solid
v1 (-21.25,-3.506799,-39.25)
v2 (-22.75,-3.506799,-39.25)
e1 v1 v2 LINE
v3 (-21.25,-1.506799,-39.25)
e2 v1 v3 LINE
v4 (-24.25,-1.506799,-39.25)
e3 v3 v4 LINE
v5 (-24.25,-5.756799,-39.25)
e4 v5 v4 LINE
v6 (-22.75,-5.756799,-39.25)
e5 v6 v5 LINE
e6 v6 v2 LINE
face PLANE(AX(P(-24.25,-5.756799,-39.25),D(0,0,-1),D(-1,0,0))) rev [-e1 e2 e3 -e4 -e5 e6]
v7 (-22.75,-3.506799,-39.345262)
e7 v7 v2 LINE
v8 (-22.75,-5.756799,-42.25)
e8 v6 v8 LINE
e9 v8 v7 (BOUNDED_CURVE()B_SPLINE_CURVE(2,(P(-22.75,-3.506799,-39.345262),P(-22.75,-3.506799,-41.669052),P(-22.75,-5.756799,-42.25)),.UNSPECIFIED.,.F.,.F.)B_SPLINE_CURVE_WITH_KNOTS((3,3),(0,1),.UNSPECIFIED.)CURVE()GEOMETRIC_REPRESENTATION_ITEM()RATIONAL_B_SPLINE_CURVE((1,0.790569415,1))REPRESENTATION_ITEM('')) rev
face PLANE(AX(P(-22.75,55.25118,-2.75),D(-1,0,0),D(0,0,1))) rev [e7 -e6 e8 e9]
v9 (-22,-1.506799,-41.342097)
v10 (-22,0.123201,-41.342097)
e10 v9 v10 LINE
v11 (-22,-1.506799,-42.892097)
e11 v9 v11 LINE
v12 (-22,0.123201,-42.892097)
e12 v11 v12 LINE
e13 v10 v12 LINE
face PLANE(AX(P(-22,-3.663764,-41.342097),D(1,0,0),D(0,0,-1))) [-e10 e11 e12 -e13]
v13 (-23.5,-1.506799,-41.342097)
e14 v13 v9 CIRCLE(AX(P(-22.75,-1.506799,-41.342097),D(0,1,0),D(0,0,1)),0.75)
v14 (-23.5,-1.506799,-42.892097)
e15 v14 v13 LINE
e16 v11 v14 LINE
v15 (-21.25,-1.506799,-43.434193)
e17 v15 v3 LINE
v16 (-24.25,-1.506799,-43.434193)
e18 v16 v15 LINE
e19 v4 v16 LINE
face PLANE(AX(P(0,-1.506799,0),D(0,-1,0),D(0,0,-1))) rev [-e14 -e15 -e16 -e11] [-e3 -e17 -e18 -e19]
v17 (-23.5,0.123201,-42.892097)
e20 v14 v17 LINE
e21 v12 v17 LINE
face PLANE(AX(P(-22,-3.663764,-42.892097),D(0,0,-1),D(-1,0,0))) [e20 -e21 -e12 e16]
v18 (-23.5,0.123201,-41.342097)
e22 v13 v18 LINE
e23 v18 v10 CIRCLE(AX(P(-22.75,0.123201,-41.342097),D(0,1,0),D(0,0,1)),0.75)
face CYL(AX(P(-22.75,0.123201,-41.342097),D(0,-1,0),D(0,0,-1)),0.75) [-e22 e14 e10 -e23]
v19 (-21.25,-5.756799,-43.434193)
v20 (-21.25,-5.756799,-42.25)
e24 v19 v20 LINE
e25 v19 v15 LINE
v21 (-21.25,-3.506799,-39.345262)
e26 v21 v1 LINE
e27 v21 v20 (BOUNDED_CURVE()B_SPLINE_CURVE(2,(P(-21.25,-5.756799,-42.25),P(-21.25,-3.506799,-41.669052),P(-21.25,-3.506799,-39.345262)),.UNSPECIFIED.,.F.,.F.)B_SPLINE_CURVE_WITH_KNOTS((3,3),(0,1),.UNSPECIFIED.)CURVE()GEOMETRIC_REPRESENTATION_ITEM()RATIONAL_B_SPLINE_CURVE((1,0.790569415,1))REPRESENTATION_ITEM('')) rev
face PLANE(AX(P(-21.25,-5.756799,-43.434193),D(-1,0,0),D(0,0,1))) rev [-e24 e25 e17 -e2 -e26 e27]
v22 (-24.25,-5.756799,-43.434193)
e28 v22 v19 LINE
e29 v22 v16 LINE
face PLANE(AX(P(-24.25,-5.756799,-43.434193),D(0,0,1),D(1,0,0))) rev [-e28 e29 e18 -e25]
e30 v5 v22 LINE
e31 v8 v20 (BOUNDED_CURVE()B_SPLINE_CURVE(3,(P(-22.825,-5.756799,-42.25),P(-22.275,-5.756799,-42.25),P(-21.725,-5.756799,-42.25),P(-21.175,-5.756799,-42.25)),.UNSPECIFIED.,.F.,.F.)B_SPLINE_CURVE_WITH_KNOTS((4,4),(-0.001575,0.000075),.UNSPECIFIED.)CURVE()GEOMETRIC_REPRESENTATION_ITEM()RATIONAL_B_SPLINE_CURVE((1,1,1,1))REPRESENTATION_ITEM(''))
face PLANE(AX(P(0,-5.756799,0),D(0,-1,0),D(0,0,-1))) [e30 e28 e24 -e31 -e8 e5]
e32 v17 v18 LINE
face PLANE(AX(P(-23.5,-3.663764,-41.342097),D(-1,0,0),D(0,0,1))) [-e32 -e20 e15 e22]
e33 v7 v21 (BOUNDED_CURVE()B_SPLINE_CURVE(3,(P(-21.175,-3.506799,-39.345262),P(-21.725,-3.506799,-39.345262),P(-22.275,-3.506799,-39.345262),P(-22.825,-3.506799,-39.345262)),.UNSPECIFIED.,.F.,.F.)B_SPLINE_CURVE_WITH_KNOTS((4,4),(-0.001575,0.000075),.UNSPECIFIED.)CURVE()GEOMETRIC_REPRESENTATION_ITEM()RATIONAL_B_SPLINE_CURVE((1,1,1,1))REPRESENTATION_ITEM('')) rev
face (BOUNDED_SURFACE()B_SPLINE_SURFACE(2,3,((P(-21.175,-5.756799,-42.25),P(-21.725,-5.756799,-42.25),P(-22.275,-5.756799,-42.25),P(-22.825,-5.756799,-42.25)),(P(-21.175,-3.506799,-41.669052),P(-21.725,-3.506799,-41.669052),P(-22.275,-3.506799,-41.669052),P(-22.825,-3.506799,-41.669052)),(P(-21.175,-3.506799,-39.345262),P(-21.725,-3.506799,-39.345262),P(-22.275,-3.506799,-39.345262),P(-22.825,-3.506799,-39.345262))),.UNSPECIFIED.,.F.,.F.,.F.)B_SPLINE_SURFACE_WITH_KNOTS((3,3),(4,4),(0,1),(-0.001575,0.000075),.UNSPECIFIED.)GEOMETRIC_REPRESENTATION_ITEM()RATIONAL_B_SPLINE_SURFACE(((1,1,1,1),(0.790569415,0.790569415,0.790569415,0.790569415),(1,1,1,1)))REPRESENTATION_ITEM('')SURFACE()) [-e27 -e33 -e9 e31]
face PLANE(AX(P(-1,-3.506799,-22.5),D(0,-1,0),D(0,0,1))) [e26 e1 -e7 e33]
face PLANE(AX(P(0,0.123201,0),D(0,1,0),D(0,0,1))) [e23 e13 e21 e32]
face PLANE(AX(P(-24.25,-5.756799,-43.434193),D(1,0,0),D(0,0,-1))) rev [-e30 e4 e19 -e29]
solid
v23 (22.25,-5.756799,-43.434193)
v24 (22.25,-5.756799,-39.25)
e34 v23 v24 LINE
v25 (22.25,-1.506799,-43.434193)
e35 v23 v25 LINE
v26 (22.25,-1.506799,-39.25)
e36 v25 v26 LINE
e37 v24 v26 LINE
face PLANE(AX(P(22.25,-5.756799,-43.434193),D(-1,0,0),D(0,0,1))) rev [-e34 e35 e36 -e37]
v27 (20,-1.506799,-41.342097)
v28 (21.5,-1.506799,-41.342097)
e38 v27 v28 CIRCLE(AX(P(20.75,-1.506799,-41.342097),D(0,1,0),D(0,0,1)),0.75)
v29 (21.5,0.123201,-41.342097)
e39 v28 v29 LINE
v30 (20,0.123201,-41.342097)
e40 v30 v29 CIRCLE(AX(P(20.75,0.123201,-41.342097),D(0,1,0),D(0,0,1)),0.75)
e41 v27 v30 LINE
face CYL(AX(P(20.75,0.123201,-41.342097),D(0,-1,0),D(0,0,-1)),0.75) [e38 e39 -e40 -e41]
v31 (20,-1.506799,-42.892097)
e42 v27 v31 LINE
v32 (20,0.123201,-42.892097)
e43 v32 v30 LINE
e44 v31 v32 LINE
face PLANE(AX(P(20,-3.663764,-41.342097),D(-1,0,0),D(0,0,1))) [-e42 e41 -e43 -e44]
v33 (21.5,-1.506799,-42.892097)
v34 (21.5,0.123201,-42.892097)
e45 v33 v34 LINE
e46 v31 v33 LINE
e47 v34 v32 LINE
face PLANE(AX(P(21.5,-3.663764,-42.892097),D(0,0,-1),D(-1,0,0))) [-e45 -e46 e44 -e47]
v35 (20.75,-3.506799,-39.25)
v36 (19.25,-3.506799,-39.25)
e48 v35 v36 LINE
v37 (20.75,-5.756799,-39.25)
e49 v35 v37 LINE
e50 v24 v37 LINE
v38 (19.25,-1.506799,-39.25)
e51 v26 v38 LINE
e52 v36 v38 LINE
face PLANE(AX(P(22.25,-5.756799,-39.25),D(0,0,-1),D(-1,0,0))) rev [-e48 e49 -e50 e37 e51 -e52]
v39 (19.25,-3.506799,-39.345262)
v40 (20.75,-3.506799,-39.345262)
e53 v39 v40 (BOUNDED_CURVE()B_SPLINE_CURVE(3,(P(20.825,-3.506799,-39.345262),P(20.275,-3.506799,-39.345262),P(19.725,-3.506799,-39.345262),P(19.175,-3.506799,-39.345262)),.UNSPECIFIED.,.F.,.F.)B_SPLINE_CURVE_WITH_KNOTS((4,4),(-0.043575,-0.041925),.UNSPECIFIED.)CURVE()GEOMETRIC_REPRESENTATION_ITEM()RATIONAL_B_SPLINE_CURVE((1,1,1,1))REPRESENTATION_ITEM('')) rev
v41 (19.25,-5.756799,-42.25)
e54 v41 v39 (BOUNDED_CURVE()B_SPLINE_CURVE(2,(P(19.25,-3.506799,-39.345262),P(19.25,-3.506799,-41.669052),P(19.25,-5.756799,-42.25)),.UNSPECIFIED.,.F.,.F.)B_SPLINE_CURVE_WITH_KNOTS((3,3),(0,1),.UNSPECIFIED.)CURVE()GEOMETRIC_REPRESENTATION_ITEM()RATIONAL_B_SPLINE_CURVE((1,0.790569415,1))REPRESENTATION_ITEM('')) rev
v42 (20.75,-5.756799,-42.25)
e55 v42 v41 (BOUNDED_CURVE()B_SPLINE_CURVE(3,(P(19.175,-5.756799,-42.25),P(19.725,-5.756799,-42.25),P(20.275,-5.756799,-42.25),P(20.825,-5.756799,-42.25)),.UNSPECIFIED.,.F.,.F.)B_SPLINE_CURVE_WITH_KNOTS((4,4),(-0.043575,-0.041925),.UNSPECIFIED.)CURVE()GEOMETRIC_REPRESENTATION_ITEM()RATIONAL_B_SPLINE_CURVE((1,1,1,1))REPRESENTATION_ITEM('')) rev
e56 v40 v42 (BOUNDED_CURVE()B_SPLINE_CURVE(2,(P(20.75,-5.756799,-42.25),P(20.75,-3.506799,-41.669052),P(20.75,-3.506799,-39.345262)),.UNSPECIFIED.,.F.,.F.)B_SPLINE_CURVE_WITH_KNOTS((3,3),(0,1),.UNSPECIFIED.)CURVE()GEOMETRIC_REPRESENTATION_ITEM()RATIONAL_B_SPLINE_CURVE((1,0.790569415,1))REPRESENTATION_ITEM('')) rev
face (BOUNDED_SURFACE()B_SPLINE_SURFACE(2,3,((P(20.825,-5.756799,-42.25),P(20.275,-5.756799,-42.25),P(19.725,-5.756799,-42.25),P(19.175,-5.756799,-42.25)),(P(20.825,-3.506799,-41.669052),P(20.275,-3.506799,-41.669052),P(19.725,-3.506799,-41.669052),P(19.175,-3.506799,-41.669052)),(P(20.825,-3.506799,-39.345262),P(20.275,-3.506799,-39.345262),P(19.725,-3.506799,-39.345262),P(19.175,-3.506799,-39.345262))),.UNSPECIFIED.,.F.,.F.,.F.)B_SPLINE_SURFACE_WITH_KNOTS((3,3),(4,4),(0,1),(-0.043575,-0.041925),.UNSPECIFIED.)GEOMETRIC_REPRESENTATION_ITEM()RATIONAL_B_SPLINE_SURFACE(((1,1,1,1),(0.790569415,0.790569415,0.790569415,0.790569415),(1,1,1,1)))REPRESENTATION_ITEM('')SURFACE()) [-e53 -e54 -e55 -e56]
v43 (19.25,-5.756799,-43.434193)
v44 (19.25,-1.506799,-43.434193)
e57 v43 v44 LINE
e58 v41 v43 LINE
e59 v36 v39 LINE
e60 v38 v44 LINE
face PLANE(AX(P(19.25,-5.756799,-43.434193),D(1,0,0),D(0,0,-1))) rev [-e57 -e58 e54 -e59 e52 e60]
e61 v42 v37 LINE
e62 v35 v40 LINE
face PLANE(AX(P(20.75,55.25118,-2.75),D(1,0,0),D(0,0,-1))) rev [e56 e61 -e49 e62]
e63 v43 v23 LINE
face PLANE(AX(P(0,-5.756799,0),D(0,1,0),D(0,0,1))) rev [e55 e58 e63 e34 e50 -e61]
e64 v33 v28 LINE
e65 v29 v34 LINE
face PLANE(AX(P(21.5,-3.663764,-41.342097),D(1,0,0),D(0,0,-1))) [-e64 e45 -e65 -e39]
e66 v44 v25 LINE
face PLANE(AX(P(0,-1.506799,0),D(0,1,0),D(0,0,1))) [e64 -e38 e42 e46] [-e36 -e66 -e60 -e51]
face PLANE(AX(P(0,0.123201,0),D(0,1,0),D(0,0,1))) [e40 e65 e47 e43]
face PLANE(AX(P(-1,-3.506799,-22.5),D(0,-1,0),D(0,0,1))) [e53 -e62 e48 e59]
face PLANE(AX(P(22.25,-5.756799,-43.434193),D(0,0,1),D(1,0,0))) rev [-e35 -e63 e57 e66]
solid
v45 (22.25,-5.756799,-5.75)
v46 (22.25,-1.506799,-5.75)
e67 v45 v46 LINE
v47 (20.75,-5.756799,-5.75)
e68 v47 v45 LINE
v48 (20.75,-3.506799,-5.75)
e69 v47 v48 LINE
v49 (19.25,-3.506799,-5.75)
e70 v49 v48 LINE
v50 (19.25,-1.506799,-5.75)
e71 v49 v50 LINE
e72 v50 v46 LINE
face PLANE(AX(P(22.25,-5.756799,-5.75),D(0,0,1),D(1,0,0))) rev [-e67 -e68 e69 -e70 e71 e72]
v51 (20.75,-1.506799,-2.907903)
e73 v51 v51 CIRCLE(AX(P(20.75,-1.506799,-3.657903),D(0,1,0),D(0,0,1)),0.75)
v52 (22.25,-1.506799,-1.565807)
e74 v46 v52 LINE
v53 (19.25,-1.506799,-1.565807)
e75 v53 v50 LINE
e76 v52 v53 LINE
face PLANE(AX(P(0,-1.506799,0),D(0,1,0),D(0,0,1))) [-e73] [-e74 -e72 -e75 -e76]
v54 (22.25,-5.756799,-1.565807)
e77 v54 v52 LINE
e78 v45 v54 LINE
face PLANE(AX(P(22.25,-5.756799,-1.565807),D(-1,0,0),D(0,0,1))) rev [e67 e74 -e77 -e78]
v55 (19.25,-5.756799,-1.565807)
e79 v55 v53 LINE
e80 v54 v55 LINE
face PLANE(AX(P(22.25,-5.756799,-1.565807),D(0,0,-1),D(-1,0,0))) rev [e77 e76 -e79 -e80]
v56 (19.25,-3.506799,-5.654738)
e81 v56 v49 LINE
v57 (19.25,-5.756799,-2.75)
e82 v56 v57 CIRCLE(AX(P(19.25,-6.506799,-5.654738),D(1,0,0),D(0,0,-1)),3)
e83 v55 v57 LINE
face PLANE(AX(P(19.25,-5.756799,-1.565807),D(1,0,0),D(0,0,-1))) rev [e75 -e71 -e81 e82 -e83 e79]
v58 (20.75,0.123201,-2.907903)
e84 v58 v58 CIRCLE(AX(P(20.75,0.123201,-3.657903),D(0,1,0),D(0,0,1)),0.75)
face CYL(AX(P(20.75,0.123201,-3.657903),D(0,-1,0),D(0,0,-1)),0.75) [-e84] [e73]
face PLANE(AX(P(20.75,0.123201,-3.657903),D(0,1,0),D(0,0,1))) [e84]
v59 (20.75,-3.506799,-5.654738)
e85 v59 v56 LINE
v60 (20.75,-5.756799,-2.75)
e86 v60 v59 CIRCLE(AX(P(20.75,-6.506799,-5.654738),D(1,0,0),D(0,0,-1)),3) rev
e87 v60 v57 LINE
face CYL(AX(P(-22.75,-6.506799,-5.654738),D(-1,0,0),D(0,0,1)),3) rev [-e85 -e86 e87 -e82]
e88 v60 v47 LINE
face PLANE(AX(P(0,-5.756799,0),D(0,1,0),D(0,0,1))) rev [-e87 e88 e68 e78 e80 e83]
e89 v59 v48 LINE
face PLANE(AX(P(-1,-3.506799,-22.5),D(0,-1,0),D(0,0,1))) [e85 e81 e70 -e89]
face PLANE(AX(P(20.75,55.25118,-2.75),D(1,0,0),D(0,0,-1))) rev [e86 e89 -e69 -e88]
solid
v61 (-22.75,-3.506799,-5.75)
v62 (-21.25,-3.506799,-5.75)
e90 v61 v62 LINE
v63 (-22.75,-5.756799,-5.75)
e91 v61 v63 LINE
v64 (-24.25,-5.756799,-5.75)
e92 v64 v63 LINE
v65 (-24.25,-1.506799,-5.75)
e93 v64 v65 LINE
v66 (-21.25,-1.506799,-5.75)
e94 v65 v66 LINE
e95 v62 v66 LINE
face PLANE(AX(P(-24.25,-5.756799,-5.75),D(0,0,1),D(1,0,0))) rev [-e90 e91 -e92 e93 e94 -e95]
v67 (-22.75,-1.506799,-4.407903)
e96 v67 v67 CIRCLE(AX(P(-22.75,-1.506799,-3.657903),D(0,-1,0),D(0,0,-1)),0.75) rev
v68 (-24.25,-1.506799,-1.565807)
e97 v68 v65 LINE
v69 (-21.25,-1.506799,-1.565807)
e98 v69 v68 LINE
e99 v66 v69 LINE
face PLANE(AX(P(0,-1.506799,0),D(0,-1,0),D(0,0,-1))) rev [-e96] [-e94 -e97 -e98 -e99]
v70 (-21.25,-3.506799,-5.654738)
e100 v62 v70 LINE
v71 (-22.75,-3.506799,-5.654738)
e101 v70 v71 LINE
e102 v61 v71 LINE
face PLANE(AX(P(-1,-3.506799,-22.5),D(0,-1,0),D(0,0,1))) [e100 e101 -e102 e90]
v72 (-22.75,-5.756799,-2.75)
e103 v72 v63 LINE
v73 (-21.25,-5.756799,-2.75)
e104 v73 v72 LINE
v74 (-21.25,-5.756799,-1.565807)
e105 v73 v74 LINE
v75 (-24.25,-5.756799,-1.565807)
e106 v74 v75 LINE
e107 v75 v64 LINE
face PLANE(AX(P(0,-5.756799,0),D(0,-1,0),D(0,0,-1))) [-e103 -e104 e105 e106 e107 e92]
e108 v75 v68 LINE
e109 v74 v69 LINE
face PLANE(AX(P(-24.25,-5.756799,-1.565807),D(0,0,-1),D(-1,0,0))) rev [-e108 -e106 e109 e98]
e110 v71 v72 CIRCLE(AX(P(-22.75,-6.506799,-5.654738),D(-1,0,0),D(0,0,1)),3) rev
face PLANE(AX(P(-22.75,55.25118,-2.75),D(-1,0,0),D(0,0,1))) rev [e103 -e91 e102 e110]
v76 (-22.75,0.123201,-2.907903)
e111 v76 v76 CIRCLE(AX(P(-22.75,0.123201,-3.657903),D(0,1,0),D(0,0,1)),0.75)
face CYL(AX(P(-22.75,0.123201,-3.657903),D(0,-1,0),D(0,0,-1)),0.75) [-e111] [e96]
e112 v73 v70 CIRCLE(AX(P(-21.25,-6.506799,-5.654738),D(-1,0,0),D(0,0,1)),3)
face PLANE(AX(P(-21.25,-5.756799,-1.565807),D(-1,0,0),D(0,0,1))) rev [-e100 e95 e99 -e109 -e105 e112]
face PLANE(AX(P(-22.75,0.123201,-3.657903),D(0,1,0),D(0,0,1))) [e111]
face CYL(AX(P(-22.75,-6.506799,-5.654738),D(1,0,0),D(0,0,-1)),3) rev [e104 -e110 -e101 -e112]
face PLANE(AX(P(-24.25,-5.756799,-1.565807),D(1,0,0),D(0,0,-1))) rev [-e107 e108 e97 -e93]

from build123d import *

# Parameters (mm, degrees)
SKETCH1_W             = 3
SKETCH1_H             = 4.18419334
BOSS_EXTRUDE1_DEPTH   = 4.25
BOSS_EXTRUDE1_2_DEPTH = 4.25
BOSS_EXTRUDE1_3_DEPTH = 4.25
BOSS_EXTRUDE1_4_DEPTH = 4.25
SKETCH2_W             = 43.5
SKETCH2_H             = 39.5
CUT_EXTRUDE1_DEPTH    = 2.25
FILLET1_R             = 3
FILLET2_R             = 3
SKETCH3_R             = 0.75
BOSS_EXTRUDE2_DEPTH   = 1.63
FILLET3_R             = 3
FILLET4_START         = -22.75
FILLET4_DEPTH         = 1.5
SKETCH4_W             = 1.5
SKETCH4_H             = 1.55
BOSS_EXTRUDE3_DEPTH   = 1.63
SKETCH5_W             = 1.5
SKETCH5_H             = 1.55
BOSS_EXTRUDE4_DEPTH   = 1.63


with BuildPart() as part:
    # Sketch1 → Boss-Extrude1 (new body)
    with BuildSketch(Plane.XZ.offset(1.506798548)):
        with Locations((-22.75, -3.65790333)):
            Rectangle(SKETCH1_W, SKETCH1_H)
    extrude(amount=BOSS_EXTRUDE1_DEPTH)


with BuildPart() as body_2:
    # Sketch1 → Boss-Extrude1 2 (new body)
    with BuildSketch(Plane.XZ.offset(1.506798548)):
        with Locations((20.75, -3.65790333)):
            Rectangle(SKETCH1_W, SKETCH1_H)
    extrude(amount=BOSS_EXTRUDE1_2_DEPTH)


with BuildPart() as body_3:
    # Sketch1 → Boss-Extrude1 3 (new body)
    with BuildSketch(Plane.XZ.offset(1.506798548)):
        with Locations((20.75, -41.34209667)):
            Rectangle(SKETCH1_W, SKETCH1_H)
    extrude(amount=BOSS_EXTRUDE1_3_DEPTH)


with BuildPart() as body_4:
    # Sketch1 → Boss-Extrude1 4 (new body)
    with BuildSketch(Plane.XZ.offset(1.506798548)):
        with Locations((-22.75, -41.34209667)):
            Rectangle(SKETCH1_W, SKETCH1_H)
    extrude(amount=BOSS_EXTRUDE1_4_DEPTH)


with BuildPart() as cut_extrude1_tool:
    # Sketch2 → Cut-Extrude1 (new body)
    with BuildSketch(Plane.XZ.offset(5.756798548)):
        with Locations((-1, -22.5)):
            Rectangle(SKETCH2_W, SKETCH2_H)
    extrude(amount=-CUT_EXTRUDE1_DEPTH)


with BuildPart() as part_1:
    add(part.part)

    # Cut-Extrude1: cut by cut_extrude1_tool
    add(cut_extrude1_tool.part, mode=Mode.SUBTRACT)

    # Fillet1
    # the kernel refuses this fillet: 3 mm, written as the material it adds along each edge
    with BuildSketch(Plane(origin=(-22.75, -3.506798548, -2.75), x_dir=(0, 0, -1), z_dir=(1, 0, 0))) as fillet1_piece_1:
        with BuildLine():
            CenterArc((2.90473751, -3), FILLET1_R, 90, 75.522487814)
            Line((0, -2.25), (-0.05809475, -2.235))
            ThreePointArc((-0.05809475, -2.235), (-0.06, -1.125), (-0.06, 0))
            Line((-0.06, 0), (0, 0.06))
            Line((0, 0.06), (2.90473751, 0.06))
            Line((2.90473751, 0.06), (2.90473751, 0))
        make_face()
    extrude(amount=1.5)



with BuildPart() as body_2_1:
    add(body_2.part)

    # Cut-Extrude1: cut by cut_extrude1_tool
    add(cut_extrude1_tool.part, mode=Mode.SUBTRACT)

    # Fillet2
    # the kernel refuses this fillet: 3 mm, written as the material it adds along each edge
    with BuildSketch(Plane(origin=(19.25, -3.506798548, -2.75), x_dir=(0, 0, -1), z_dir=(1, 0, 0))) as fillet2_piece_1:
        with BuildLine():
            CenterArc((2.90473751, -3), FILLET2_R, 90, 75.522487814)
            Line((0, -2.25), (-0.05809475, -2.235))
            ThreePointArc((-0.05809475, -2.235), (-0.06, -1.125), (-0.06, 0))
            Line((-0.06, 0), (0, 0.06))
            Line((0, 0.06), (2.90473751, 0.06))
            Line((2.90473751, 0.06), (2.90473751, 0))
        make_face()
    extrude(amount=1.5)


with BuildPart() as body_3_1:
    add(body_3.part)

    # Cut-Extrude1: cut by cut_extrude1_tool
    add(cut_extrude1_tool.part, mode=Mode.SUBTRACT)

    # Fillet3
    # the kernel refuses this fillet: 3 mm, written as the material it adds along each edge
    with BuildSketch(Plane(origin=(20.75, -3.506798548, -42.25), x_dir=(0, 0, 1), z_dir=(-1, 0, 0))) as fillet3_piece_1:
        with BuildLine():
            CenterArc((2.90473751, -3), FILLET3_R, 90, 75.522487814)
            Line((0, -2.25), (-0.05809475, -2.235))
            ThreePointArc((-0.05809475, -2.235), (-0.06, -1.125), (-0.06, 0))
            Line((-0.06, 0), (0, 0.06))
            Line((0, 0.06), (2.90473751, 0.06))
            Line((2.90473751, 0.06), (2.90473751, 0))
        make_face()
    extrude(amount=1.5)


with BuildPart() as body_4_1:
    add(body_4.part)

    # Cut-Extrude1: cut by cut_extrude1_tool
    add(cut_extrude1_tool.part, mode=Mode.SUBTRACT)

    # Fillet4: read off the stored shape, not the designer's step
    # Fillet4 outline → Fillet4 (add)
    with BuildSketch(Plane.YZ.offset(FILLET4_START)):
        with BuildLine():
            add(Edge.make_bspline(
                [(-5.756798548, -42.25), (-3.506798548, -41.669052498), (-3.506798548, -39.34526249)],
                knots=[0, 0, 0, 1, 1, 1], degree=2, weights=[1, 0.790569415, 1]))
            Line((-5.756798548, -42.25), (-3.506798548, -42.25))
            Line((-3.506798548, -42.25), (-3.506798548, -39.34526249))
        make_face()
    extrude(amount=FILLET4_DEPTH)


with BuildPart() as part_2:
    add(part_1.part)

    add(body_2_1.part)  # Boss-Extrude2 merges body 2
    # Sketch3 → Boss-Extrude2 (add)
    with BuildSketch(Plane(origin=(0, -1.506798548, 0), x_dir=(1, 0, 0), z_dir=(0, 1, 0))):
        with Locations(Location((20.75, 3.65790333, 0), (0, 0, 270))):
            Circle(SKETCH3_R)
        with Locations(Location((-22.75, 3.65790333, 0), (0, 0, 90))):
            Circle(SKETCH3_R)
        with Locations(Location((20.75, 41.34209667, 0), (0, 0, 270))):
            Circle(SKETCH3_R)
        with Locations(Location((-22.75, 41.34209667, 0), (0, 0, 270))):
            Circle(SKETCH3_R)
    extrude(amount=BOSS_EXTRUDE2_DEPTH)


    add(body_4_1.part)  # Boss-Extrude3 merges body 4
    # Sketch4 → Boss-Extrude3 (add)
    with BuildSketch(Plane(origin=(0, 0.123201452, 0), x_dir=(1, 0, 0), z_dir=(0, 1, 0))):
        with Locations((-22.75, 42.11709667)):
            Rectangle(SKETCH4_W, SKETCH4_H)
    extrude(amount=-BOSS_EXTRUDE3_DEPTH)


    add(body_3_1.part)  # Boss-Extrude4 merges body 3
    # Sketch5 → Boss-Extrude4 (add)
    with BuildSketch(Plane(origin=(0, 0.123201452, 0), x_dir=(1, 0, 0), z_dir=(0, 1, 0))):
        with Locations((20.75, 42.11709667)):
            Rectangle(SKETCH5_W, SKETCH5_H)
    extrude(amount=-BOSS_EXTRUDE4_DEPTH)


solid = part_2.part
